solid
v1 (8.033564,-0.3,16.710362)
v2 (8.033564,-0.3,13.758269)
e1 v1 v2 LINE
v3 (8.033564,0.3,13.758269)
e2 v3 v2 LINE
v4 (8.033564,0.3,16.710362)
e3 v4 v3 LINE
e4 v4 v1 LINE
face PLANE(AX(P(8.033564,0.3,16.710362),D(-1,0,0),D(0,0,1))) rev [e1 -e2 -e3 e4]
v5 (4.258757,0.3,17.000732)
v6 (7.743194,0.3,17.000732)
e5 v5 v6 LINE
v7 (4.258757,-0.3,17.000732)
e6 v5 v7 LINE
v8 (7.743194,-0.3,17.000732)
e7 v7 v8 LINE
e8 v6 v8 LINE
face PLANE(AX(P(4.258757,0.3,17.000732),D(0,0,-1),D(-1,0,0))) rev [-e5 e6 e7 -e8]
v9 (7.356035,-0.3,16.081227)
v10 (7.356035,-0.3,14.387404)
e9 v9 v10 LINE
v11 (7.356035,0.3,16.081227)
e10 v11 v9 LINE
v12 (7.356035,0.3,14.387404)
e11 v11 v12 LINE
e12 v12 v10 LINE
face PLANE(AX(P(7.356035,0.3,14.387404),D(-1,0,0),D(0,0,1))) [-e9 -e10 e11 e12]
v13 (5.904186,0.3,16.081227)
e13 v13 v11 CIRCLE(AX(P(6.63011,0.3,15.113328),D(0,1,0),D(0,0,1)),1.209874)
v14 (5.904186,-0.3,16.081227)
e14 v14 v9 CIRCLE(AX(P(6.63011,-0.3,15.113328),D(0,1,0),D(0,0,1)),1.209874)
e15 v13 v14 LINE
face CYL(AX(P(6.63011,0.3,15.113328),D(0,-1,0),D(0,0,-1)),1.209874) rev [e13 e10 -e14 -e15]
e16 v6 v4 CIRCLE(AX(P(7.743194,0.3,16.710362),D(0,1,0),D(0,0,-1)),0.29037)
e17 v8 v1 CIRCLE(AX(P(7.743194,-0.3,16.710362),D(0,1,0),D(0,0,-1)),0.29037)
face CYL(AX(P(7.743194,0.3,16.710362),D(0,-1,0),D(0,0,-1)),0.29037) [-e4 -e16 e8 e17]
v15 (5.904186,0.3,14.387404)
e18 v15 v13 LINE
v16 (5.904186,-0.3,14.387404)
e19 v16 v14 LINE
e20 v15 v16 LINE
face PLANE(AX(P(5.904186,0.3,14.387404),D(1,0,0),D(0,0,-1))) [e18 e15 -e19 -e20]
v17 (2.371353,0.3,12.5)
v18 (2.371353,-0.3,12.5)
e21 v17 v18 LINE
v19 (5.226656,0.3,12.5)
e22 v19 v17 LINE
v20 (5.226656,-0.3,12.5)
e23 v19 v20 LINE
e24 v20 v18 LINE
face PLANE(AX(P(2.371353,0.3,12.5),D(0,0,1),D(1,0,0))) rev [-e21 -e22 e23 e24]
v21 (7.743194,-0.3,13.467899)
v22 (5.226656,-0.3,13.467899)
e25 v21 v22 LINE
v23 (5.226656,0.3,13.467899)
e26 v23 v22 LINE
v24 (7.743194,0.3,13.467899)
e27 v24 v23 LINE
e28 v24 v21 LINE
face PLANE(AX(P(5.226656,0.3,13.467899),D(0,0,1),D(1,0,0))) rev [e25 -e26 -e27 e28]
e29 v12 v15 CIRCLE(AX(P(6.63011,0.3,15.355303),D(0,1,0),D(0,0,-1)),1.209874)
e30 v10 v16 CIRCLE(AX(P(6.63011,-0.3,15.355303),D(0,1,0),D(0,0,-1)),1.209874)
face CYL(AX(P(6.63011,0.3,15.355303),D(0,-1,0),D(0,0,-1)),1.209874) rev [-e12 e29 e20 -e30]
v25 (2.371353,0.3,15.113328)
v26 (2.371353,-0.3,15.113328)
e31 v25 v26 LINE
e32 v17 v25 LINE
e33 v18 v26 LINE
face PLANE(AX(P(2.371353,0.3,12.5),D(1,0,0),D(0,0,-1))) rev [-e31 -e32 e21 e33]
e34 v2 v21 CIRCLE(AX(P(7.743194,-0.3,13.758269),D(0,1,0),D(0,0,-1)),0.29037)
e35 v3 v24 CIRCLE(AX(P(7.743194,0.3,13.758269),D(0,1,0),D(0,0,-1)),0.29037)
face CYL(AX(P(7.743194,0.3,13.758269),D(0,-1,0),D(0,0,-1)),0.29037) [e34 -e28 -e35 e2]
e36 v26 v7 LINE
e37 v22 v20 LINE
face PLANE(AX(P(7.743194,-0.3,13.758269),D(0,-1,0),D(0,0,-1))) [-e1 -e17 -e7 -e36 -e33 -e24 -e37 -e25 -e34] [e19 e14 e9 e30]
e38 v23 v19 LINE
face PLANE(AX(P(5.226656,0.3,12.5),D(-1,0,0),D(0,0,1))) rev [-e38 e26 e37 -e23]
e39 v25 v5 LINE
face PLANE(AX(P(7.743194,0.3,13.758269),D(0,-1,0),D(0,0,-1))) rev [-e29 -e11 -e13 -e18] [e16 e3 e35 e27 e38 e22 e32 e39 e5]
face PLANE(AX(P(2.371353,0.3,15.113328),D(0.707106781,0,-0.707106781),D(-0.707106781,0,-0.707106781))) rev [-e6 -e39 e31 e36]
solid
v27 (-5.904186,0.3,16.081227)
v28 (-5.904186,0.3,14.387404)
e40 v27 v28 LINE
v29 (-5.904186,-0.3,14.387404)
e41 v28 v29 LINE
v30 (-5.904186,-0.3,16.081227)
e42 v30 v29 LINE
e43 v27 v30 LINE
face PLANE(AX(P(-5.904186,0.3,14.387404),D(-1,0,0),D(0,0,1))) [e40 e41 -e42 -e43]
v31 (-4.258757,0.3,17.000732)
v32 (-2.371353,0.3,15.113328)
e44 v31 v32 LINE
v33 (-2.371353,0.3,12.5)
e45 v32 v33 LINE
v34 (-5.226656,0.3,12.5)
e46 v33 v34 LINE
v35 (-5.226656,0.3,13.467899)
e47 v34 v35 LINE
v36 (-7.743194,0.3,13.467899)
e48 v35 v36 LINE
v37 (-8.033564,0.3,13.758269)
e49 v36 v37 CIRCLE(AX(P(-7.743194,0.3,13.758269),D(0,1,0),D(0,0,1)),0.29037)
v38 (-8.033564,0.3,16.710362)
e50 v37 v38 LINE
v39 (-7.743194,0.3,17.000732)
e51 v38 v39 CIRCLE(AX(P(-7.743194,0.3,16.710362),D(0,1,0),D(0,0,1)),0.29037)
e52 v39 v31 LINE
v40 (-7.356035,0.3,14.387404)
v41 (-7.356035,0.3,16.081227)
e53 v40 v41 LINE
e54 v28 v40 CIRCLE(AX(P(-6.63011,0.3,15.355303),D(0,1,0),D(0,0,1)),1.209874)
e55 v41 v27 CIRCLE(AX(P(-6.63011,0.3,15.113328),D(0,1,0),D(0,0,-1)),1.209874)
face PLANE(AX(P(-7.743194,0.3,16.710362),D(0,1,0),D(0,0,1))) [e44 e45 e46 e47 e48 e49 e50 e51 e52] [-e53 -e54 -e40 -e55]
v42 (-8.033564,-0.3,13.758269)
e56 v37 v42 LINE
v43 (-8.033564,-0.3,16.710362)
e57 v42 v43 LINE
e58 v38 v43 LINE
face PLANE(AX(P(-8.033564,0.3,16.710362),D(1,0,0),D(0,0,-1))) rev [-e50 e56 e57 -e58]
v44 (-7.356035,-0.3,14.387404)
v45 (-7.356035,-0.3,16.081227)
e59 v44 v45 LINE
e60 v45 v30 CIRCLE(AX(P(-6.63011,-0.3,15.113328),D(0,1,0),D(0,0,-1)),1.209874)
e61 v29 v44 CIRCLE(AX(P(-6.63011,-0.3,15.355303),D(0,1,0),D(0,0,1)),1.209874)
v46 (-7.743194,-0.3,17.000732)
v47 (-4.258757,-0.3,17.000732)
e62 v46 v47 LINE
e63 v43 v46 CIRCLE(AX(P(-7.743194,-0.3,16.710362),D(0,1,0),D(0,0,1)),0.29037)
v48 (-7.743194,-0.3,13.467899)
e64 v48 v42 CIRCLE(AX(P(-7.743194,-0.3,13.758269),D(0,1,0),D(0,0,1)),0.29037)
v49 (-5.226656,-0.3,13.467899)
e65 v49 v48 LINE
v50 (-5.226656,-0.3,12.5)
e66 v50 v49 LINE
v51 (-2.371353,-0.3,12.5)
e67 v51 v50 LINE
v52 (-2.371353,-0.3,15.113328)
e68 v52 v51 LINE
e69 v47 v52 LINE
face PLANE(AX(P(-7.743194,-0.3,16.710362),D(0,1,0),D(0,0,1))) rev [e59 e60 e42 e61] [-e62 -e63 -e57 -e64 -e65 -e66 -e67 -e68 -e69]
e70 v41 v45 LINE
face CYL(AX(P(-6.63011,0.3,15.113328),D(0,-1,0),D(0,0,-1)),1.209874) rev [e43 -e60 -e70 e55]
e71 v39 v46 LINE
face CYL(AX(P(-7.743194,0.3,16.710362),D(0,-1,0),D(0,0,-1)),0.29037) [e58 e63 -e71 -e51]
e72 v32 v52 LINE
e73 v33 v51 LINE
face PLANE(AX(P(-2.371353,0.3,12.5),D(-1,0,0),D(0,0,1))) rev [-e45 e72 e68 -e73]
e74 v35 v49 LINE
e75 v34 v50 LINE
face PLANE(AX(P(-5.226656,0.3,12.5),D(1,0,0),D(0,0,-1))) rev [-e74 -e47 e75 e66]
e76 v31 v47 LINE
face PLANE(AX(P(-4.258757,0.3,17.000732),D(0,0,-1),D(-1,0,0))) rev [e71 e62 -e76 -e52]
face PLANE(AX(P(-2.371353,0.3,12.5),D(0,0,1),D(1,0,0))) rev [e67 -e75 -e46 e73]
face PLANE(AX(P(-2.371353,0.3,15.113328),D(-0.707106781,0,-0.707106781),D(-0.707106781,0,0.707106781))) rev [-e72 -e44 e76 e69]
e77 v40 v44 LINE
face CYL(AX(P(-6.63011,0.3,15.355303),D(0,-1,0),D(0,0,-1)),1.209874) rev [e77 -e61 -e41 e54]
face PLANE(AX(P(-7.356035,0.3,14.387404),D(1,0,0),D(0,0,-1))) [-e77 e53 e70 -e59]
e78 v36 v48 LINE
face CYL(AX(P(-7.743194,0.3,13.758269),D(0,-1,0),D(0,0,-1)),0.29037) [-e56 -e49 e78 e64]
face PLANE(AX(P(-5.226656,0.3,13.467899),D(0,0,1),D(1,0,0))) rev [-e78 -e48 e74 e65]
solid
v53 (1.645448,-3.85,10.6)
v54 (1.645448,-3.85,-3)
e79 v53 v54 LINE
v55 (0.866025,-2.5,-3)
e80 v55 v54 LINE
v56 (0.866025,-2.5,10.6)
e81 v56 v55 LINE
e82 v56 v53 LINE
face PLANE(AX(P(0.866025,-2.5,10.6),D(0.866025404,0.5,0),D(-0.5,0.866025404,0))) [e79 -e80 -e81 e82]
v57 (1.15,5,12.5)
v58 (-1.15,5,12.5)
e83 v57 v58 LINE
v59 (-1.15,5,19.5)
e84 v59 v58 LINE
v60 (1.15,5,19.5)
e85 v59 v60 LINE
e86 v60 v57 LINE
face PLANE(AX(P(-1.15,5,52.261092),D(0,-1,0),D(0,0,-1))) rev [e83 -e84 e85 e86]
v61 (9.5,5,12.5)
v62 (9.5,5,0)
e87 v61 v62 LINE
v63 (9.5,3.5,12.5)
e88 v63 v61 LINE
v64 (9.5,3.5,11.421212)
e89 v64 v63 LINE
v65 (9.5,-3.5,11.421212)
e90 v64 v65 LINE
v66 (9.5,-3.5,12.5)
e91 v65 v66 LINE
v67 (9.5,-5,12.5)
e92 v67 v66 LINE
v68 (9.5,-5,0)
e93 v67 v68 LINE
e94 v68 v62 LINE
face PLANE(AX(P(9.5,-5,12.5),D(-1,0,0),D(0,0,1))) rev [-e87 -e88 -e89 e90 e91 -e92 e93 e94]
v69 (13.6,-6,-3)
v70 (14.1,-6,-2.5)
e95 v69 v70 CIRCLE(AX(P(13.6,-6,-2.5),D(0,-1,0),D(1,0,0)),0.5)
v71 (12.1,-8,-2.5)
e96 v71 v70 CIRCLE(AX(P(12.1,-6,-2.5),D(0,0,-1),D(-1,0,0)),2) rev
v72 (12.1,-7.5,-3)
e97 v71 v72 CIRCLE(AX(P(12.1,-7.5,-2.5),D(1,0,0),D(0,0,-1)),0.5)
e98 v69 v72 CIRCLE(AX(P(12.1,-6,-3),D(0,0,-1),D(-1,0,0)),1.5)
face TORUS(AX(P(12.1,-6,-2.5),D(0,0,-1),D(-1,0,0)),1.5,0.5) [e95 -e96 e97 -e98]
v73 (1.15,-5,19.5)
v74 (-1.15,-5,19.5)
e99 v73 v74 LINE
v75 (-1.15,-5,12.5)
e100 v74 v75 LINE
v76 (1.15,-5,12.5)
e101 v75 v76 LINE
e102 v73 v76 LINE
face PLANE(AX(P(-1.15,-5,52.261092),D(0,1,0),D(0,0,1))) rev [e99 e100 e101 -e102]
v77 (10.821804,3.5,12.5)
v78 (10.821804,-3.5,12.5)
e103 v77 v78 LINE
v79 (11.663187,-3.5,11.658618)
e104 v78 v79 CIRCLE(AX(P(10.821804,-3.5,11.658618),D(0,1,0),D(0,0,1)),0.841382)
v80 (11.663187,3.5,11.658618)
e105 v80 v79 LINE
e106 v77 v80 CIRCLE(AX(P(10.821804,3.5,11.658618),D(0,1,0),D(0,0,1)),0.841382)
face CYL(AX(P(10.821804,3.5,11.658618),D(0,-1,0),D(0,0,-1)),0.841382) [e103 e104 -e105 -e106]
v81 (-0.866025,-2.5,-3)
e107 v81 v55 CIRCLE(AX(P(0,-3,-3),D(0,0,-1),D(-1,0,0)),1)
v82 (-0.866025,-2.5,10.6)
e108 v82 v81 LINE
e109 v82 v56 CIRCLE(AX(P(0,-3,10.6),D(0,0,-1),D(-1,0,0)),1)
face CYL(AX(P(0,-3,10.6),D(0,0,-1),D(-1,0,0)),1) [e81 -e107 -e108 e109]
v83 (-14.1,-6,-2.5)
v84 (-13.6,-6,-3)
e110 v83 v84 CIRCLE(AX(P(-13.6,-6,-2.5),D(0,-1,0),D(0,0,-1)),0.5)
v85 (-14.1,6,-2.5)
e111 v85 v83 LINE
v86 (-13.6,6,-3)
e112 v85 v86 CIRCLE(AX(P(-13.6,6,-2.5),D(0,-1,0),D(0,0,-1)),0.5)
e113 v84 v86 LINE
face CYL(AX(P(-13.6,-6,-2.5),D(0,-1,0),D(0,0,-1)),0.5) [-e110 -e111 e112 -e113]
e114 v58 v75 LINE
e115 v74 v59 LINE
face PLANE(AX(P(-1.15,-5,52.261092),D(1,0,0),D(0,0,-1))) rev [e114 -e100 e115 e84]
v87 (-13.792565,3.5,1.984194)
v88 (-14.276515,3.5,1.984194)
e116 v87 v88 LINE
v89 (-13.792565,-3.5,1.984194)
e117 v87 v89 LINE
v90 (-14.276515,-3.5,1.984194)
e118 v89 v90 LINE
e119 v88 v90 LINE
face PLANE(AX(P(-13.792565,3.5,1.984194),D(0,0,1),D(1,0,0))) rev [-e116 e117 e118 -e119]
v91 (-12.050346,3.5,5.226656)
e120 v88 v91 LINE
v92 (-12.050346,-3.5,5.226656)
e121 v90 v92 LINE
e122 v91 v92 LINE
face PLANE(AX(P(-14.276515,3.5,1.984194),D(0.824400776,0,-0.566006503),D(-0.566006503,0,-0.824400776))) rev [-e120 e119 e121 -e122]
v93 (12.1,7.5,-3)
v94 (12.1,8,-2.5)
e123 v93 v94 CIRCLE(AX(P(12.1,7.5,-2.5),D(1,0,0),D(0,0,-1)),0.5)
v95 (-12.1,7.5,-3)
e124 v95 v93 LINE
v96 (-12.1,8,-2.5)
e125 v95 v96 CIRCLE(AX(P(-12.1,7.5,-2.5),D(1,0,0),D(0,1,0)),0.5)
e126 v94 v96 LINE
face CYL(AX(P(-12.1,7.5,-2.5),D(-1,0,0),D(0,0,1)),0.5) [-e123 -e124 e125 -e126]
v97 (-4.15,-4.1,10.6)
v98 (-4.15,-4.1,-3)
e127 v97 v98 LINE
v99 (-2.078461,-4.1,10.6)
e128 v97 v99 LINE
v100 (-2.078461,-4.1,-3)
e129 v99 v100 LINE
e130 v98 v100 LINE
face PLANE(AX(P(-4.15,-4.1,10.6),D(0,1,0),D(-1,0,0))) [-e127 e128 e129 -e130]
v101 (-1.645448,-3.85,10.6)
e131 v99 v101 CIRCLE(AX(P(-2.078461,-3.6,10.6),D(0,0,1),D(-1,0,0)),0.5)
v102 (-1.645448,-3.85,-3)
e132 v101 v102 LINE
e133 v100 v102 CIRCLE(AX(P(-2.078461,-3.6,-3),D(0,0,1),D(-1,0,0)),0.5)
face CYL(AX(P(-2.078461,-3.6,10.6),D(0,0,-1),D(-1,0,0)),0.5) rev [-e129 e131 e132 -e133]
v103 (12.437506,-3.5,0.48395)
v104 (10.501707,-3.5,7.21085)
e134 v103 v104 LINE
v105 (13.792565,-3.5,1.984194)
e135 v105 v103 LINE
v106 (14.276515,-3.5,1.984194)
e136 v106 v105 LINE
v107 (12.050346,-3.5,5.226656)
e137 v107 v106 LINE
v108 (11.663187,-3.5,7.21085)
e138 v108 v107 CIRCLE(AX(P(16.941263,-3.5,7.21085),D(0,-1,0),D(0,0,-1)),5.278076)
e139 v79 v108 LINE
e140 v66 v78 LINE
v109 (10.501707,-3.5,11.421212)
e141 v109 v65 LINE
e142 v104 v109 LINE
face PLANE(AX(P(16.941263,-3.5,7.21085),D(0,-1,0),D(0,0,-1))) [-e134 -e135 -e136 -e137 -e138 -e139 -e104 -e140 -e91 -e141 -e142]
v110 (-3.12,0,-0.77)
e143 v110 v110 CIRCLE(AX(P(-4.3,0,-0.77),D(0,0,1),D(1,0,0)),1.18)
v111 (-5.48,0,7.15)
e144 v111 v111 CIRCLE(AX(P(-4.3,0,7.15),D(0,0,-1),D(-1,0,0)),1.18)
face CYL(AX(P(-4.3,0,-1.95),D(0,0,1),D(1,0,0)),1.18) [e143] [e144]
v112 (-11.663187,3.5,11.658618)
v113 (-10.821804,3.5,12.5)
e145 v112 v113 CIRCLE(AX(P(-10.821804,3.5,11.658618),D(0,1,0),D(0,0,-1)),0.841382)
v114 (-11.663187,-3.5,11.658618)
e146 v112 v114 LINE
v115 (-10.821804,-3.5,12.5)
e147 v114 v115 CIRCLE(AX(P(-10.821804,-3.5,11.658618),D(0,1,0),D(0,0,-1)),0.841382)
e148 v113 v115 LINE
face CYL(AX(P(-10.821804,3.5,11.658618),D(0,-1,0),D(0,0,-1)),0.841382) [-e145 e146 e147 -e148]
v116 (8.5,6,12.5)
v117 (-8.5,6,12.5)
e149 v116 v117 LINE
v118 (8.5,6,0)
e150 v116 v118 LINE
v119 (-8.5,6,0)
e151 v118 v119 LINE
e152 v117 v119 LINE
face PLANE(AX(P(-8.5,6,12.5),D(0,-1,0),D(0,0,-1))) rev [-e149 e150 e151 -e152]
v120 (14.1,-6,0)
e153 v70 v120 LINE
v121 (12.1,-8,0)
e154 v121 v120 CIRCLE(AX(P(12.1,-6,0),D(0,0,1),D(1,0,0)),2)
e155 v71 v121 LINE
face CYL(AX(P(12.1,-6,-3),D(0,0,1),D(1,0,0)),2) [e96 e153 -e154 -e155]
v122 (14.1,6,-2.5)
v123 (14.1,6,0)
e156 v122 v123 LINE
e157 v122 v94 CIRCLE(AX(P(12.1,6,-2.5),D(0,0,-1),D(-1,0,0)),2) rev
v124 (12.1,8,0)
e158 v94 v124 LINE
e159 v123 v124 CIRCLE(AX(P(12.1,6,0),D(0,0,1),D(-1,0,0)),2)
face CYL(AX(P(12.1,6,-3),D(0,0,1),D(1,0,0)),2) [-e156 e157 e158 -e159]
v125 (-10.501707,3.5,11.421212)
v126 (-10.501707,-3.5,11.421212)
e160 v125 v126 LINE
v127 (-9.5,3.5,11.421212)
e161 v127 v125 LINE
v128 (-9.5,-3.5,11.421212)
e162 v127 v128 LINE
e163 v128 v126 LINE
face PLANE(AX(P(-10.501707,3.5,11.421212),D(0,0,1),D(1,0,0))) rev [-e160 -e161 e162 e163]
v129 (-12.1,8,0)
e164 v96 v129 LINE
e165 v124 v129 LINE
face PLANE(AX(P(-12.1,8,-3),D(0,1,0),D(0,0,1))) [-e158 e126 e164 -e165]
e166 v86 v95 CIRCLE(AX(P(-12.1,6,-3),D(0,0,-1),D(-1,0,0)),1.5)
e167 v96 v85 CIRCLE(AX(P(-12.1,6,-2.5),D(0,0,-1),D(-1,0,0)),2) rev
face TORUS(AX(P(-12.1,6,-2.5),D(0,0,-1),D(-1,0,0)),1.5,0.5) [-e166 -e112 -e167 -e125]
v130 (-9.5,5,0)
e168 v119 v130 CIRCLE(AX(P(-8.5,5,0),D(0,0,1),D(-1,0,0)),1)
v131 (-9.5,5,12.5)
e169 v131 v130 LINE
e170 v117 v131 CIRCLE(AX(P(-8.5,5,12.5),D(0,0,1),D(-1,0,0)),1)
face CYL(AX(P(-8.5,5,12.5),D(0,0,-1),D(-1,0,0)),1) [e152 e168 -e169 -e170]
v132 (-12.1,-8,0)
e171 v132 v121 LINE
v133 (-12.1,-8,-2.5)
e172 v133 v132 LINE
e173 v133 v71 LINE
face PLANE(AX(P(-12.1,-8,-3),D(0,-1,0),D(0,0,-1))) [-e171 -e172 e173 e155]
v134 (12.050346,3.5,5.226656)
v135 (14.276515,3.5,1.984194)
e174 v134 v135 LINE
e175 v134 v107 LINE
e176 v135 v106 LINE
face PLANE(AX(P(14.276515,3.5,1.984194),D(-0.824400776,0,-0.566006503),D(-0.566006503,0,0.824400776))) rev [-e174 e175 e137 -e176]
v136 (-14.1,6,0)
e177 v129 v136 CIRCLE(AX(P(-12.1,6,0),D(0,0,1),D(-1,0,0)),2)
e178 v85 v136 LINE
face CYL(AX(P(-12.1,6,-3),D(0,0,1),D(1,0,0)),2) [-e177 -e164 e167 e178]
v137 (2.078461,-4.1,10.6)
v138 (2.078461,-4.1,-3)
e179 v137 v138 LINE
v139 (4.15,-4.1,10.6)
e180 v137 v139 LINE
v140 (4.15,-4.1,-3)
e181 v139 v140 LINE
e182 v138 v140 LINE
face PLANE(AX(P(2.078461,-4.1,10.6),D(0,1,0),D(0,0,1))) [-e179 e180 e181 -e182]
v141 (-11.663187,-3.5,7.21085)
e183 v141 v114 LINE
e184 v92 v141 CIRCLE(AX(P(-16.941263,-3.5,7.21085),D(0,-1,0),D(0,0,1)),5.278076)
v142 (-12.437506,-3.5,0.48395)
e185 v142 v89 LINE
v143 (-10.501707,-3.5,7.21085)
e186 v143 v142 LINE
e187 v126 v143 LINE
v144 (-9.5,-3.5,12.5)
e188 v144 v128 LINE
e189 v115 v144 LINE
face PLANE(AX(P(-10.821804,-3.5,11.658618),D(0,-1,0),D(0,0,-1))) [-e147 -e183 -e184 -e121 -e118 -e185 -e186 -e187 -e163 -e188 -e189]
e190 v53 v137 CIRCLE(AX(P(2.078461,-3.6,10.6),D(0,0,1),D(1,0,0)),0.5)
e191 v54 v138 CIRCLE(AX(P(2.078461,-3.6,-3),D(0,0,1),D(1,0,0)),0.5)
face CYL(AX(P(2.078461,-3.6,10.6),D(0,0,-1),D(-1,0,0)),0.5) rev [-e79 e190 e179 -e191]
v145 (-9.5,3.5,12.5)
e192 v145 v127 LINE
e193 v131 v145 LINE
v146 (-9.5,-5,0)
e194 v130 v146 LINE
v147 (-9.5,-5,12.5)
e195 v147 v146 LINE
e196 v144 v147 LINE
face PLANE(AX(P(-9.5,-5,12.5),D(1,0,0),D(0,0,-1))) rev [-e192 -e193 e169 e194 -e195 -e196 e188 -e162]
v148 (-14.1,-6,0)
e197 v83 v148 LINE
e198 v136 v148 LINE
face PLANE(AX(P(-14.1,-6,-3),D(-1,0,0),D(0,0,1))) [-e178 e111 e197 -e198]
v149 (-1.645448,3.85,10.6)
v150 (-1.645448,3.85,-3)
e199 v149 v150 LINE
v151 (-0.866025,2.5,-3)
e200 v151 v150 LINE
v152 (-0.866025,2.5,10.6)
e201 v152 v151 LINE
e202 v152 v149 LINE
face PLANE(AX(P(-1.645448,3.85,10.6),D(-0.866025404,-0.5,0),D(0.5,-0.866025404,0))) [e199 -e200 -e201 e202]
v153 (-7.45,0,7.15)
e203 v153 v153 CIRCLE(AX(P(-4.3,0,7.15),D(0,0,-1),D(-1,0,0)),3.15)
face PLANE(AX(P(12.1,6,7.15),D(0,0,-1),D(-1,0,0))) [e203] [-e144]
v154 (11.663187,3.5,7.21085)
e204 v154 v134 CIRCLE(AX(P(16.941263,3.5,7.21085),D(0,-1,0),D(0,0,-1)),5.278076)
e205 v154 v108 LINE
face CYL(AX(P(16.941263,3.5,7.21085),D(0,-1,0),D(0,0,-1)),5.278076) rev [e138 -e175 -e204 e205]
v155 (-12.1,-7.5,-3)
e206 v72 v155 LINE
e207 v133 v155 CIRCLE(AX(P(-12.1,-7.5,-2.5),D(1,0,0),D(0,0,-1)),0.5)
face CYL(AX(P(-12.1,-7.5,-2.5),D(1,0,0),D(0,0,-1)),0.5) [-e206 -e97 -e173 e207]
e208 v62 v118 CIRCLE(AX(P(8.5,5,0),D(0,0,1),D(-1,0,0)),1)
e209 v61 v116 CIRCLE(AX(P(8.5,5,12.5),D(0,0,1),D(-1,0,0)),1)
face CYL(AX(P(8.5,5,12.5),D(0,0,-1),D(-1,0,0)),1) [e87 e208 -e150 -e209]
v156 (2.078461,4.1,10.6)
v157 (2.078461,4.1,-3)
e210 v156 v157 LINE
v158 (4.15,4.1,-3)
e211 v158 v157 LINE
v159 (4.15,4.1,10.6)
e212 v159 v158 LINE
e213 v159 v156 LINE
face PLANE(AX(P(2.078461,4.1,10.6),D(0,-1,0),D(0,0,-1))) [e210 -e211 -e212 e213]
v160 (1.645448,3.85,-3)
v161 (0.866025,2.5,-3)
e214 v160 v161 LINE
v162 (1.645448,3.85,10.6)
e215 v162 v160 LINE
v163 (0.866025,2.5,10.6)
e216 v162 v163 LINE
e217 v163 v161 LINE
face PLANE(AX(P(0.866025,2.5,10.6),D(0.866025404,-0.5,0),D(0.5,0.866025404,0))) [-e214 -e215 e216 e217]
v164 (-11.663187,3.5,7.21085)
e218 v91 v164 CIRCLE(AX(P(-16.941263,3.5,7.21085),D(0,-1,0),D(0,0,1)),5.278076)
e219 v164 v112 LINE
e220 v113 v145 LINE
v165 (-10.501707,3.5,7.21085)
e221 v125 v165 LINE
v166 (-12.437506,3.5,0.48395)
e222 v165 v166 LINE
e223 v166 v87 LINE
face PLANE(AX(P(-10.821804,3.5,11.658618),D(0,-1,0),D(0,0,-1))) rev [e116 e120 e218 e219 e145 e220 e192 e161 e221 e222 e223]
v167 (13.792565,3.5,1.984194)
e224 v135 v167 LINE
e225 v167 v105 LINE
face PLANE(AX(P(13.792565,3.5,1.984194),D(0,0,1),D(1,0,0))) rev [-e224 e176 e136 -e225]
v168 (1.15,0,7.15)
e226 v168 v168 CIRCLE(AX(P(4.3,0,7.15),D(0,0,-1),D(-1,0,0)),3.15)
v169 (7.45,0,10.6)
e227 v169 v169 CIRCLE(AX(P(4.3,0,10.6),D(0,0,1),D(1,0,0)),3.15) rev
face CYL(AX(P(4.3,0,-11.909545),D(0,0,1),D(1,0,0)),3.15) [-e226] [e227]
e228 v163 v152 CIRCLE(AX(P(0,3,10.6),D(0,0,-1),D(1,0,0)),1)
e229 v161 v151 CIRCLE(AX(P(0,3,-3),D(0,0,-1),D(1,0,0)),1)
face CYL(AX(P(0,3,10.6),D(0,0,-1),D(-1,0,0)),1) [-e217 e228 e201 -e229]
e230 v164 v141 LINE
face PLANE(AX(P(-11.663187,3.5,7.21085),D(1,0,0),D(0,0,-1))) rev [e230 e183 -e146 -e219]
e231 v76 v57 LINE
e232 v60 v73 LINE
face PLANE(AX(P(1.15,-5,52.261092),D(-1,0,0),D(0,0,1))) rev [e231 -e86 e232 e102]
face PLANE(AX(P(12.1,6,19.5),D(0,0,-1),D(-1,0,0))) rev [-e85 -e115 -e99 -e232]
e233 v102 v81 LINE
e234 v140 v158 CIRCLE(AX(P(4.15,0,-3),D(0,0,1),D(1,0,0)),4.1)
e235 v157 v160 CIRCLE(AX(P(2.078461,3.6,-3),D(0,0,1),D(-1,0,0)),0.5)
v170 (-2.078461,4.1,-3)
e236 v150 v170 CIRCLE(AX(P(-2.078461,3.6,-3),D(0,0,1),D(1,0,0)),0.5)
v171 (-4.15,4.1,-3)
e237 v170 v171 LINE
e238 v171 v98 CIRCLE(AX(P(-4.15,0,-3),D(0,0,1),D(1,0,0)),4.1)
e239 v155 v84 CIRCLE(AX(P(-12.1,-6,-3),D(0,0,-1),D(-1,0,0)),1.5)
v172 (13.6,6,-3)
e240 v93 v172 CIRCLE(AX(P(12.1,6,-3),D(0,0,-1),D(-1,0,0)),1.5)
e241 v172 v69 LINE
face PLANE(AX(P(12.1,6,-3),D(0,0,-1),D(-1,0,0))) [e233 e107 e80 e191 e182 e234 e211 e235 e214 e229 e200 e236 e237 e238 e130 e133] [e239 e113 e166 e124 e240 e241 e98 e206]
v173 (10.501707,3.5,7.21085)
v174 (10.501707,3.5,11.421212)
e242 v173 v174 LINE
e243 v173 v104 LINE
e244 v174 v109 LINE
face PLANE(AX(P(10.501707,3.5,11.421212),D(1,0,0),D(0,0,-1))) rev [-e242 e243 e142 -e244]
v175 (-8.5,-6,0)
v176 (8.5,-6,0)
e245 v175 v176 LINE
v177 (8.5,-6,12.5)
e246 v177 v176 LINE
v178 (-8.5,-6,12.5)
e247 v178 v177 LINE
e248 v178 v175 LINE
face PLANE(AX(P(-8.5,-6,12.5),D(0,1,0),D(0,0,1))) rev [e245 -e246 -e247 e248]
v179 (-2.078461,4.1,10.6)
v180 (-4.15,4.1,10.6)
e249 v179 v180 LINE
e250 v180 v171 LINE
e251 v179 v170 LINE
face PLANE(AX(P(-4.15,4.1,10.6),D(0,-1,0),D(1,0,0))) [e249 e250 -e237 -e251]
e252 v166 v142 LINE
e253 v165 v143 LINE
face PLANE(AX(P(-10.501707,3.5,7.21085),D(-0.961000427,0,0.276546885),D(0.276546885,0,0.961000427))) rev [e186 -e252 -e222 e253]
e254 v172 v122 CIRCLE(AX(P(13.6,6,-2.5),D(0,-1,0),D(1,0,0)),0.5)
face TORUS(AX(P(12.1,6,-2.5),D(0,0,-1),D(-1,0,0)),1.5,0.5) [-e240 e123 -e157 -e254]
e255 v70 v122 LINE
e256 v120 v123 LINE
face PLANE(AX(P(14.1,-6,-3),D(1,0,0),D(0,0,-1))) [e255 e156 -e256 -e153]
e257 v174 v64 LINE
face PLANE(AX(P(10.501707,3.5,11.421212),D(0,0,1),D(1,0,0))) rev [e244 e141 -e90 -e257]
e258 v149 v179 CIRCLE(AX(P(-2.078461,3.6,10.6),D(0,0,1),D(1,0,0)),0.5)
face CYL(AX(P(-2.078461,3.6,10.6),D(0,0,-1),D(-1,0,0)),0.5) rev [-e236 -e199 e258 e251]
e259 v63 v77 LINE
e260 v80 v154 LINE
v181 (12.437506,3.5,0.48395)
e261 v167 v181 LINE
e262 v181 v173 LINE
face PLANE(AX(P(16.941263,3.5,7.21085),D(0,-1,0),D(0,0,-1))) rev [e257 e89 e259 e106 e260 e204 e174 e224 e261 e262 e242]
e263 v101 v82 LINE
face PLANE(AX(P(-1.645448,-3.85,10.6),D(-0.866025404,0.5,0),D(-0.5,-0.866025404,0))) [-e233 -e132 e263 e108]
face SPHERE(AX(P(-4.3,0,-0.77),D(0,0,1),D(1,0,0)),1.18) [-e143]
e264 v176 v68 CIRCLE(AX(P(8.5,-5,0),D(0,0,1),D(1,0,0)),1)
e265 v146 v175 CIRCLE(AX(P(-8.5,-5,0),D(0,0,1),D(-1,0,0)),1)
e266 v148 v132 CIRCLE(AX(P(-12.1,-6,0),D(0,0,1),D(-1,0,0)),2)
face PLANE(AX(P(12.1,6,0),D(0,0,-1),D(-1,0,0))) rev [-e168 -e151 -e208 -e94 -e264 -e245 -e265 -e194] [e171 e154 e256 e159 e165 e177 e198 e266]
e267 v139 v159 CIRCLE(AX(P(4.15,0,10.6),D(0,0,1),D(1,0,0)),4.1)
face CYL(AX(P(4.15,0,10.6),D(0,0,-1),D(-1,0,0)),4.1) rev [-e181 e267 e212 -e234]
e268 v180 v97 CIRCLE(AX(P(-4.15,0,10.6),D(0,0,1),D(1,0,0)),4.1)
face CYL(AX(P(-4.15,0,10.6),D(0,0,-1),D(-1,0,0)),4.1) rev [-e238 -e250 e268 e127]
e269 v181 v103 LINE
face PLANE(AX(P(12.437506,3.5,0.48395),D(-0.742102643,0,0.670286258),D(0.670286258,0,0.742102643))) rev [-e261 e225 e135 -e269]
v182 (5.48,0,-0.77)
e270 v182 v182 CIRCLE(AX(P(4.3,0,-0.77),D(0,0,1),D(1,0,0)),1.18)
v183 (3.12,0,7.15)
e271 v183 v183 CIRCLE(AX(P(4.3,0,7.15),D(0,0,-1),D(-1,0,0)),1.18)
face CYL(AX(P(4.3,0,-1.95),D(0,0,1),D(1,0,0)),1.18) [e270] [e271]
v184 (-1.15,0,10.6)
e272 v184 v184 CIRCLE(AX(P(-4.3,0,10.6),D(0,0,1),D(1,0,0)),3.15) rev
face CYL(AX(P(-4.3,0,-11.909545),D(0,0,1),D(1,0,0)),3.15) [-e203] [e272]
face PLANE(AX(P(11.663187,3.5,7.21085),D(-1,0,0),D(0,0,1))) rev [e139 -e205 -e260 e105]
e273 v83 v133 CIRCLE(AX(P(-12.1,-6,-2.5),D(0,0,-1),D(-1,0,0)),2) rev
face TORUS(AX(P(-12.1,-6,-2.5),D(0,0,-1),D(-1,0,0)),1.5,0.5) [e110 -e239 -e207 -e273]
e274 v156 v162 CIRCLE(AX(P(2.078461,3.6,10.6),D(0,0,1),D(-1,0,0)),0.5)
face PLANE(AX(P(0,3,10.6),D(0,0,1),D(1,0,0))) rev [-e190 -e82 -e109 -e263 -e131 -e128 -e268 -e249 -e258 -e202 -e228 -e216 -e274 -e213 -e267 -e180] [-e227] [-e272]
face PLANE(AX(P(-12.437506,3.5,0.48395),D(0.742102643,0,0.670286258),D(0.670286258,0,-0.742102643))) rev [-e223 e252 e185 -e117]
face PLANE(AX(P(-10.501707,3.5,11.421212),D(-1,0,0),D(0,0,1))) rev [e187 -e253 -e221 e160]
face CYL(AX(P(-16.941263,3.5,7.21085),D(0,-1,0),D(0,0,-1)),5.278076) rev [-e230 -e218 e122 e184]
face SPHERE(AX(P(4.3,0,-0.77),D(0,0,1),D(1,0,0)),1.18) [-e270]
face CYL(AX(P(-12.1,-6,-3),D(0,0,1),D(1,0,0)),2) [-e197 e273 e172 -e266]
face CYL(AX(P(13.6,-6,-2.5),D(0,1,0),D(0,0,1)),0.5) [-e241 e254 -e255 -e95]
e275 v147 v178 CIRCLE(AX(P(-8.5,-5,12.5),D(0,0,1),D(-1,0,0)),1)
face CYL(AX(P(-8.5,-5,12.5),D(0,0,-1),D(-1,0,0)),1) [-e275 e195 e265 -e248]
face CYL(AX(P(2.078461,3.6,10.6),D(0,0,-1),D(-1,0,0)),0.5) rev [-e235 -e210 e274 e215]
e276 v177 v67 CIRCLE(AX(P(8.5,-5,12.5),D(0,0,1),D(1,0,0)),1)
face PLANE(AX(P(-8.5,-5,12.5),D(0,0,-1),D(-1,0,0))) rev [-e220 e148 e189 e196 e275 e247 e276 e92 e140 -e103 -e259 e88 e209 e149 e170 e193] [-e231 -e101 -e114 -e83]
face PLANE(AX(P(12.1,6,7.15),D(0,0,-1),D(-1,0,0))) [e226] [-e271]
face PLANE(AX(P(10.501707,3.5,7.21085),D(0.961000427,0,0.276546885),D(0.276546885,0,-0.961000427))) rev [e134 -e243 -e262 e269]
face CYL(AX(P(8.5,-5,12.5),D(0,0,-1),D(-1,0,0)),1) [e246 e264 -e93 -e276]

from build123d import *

# Parameters (mm, degrees)
BOSS_EXTRUDE1_DEPTH         = 3
BOSS_EXTRUDE3_DEPTH         = 12.5
BOSS_EXTRUDE7_DEPTH         = 3.5
CUT_EXTRUDE1_DEPTH          = 13.6
SKETCH5_W                   = 2.3
SKETCH5_H                   = 10
BOSS_EXTRUDE4_DEPTH         = 7
SKETCH7_R                   = 3.15
BOSS_EXTRUDE6_DEPTH         = 3.45
SKETCH6_R                   = 1.18
BOSS_EXTRUDE5_DEPTH         = 9.1
FILLET3_R                   = 1.18
FILLET4_R                   = 0.5
BOSS_EXTRUDE8_DEPTH         = 0.3
BOSS_EXTRUDE8_2_DEPTH       = 0.3
BODY_MOVE_COPY1_START       = -0.3
BODY_MOVE_COPY1_DEPTH       = 0.6
BODY_MOVE_COPY1_2_OUTLINE_W = 2.855302951
BODY_MOVE_COPY1_2_OUTLINE_H = 0.131085938
BODY_MOVE_COPY1_2_DEPTH     = 0.6


# Read off the part's stored shape, not the designer's step: Body-Move/Copy1
with BuildPart() as part:
    # Sketch1 → Boss-Extrude1 (new body)
    with BuildSketch(Plane.XY):
        with BuildLine():
            Line((-12.1, -8), (12.1, -8))
            ThreePointArc((12.1, -8), (13.514213562, -7.414213562), (14.1, -6))
            Line((14.1, -6), (14.1, 6))
            ThreePointArc((14.1, 6), (13.514213562, 7.414213562), (12.1, 8))
            Line((12.1, 8), (-12.1, 8))
            ThreePointArc((-12.1, 8), (-13.514213562, 7.414213562), (-14.1, 6))
            Line((-14.1, 6), (-14.1, -6))
            ThreePointArc((-14.1, -6), (-13.514213562, -7.414213562), (-12.1, -8))
        make_face()
    extrude(amount=-BOSS_EXTRUDE1_DEPTH)

    # Sketch3 → Boss-Extrude3 (add)
    with BuildSketch(Plane.XY):
        with BuildLine():
            Line((-8.5, -6), (8.5, -6))
            ThreePointArc((8.5, -6), (9.207106781, -5.707106781), (9.5, -5))
            Line((9.5, -5), (9.5, 5))
            ThreePointArc((9.5, 5), (9.207106781, 5.707106781), (8.5, 6))
            Line((8.5, 6), (-8.5, 6))
            ThreePointArc((-8.5, 6), (-9.207106781, 5.707106781), (-9.5, 5))
            Line((-9.5, 5), (-9.5, -5))
            ThreePointArc((-9.5, -5), (-9.207106781, -5.707106781), (-8.5, -6))
        make_face()
    extrude(amount=BOSS_EXTRUDE3_DEPTH)

    # Sketch10 → Boss-Extrude7 (add, symmetric)
    with BuildSketch(Plane(origin=(0, 0, 0), x_dir=(1, 0, 0), z_dir=(0, 1, 0))):
        with BuildLine():
            Line((12.437506076, -0.483949653), (13.792565104, -1.984193576))
            Line((13.792565104, -1.984193576), (14.276514757, -1.984193576))
            Line((14.276514757, -1.984193576), (12.050346354, -5.22665625))
            ThreePointArc((12.050346354, -5.22665625), (11.760880692, -6.200043614), (11.663186632, -7.210849826))
            Line((11.663186632, -7.210849826), (11.663186632, -11.658617679))
            ThreePointArc((11.663186632, -11.658617679), (11.416751456, -12.253564824), (10.82180431, -12.5))
            Line((10.82180431, -12.5), (9.5, -12.5))
            Line((9.5, -12.5), (9.5, -11.421211806))
            Line((9.5, -11.421211806), (10.501707465, -11.421211806))
            Line((10.501707465, -11.421211806), (10.501707465, -7.210849826))
            Line((10.501707465, -7.210849826), (12.437506076, -0.483949653))
        make_face()
        with BuildLine():
            Line((-9.5, -12.5), (-9.5, -11.421211806))
            Line((-9.5, -11.421211806), (-10.501707465, -11.421211806))
            Line((-10.501707465, -11.421211806), (-10.501707465, -7.210849826))
            Line((-10.501707465, -7.210849826), (-12.437506076, -0.483949653))
            Line((-12.437506076, -0.483949653), (-13.792565104, -1.984193576))
            Line((-13.792565104, -1.984193576), (-14.276514757, -1.984193576))
            Line((-14.276514757, -1.984193576), (-12.050346354, -5.22665625))
            ThreePointArc((-12.050346354, -5.22665625), (-11.760880692, -6.200043614), (-11.663186632, -7.210849826))
            Line((-11.663186632, -7.210849826), (-11.663186632, -11.658617679))
            ThreePointArc((-11.663186632, -11.658617679), (-11.416751456, -12.253564824), (-10.82180431, -12.5))
            Line((-10.82180431, -12.5), (-9.5, -12.5))
        make_face()
    extrude(amount=BOSS_EXTRUDE7_DEPTH, both=True)

    # Sketch4 → Cut-Extrude1 (cut)
    with BuildSketch(Plane.XY.offset(-3)):
        with BuildLine():
            Line((-1.645448267, 3.85), (-0.866025404, 2.5))
            ThreePointArc((-0.866025404, 2.5), (0, 2), (0.866025404, 2.5))
            Line((0.866025404, 2.5), (1.645448267, 3.85))
            ThreePointArc((1.645448267, 3.85), (1.828460969, 4.033012702), (2.078460969, 4.1))
            Line((2.078460969, 4.1), (4.15, 4.1))
            ThreePointArc((4.15, 4.1), (8.25, 0), (4.15, -4.1))
            Line((4.15, -4.1), (2.078460969, -4.1))
            ThreePointArc((2.078460969, -4.1), (1.828460969, -4.033012702), (1.645448267, -3.85))
            Line((1.645448267, -3.85), (0.866025404, -2.5))
            ThreePointArc((0.866025404, -2.5), (0, -2), (-0.866025404, -2.5))
            Line((-0.866025404, -2.5), (-1.645448267, -3.85))
            ThreePointArc((-1.645448267, -3.85), (-1.828460969, -4.033012702), (-2.078460969, -4.1))
            Line((-2.078460969, -4.1), (-4.15, -4.1))
            ThreePointArc((-4.15, -4.1), (-8.25, 0), (-4.15, 4.1))
            Line((-4.15, 4.1), (-2.078460969, 4.1))
            ThreePointArc((-2.078460969, 4.1), (-1.828460969, 4.033012702), (-1.645448267, 3.85))
        make_face()
    extrude(amount=CUT_EXTRUDE1_DEPTH, mode=Mode.SUBTRACT)

    # Sketch5 → Boss-Extrude4 (add)
    with BuildSketch(Plane.XY.offset(12.5)):
        Rectangle(SKETCH5_W, SKETCH5_H)
    extrude(amount=BOSS_EXTRUDE4_DEPTH)

    # Sketch7 → Boss-Extrude6 (add)
    with BuildSketch(Plane(origin=(0, 0, 10.6), x_dir=(-1, 0, 0), z_dir=(0, 0, -1))):
        with Locations(Location((-4.3, 0, 0), (0, 0, 180))):
            Circle(SKETCH7_R)
        with Locations(Location((4.3, 0, 0), (0, 0, 180))):
            Circle(SKETCH7_R)
    extrude(amount=BOSS_EXTRUDE6_DEPTH)

    # Sketch6 → Boss-Extrude5 (add)
    with BuildSketch(Plane(origin=(0, 0, 7.15), x_dir=(-1, 0, 0), z_dir=(0, 0, -1))):
        with Locations((-4.3, 0)):
            Circle(SKETCH6_R)
        with Locations((4.3, 0)):
            Circle(SKETCH6_R)
    extrude(amount=BOSS_EXTRUDE5_DEPTH)

    # Fillet3
    fillet3_edges = [part.edges().sort_by_distance(p)[0] for p in [
        (5.48, 0, -1.95),
        (-3.12, 0, -1.95),
    ]]
    fillet(fillet3_edges, radius=FILLET3_R)

    # Fillet4
    fillet4_edges = [part.edges().sort_by_distance(p)[0] for p in [
        (-13.514213562, 7.414213562, -3),
        (-14.1, 0, -3),
        (-13.514213562, -7.414213562, -3),
        (0, -8, -3),
        (13.514213562, -7.414213562, -3),
        (14.1, 0, -3),
        (13.514213562, 7.414213562, -3),
        (0, 8, -3),
    ]]
    fillet(fillet4_edges, radius=FILLET4_R)


with BuildPart() as body_2:
    # Sketch11 → Boss-Extrude8 (new, symmetric)
    with BuildSketch(Plane(origin=(0, 0, 0), x_dir=(1, 0, 0), z_dir=(0, 1, 0))):
        with BuildLine():
            Line((2.371353299, -12.631085938), (2.371353299, -15.244414062))
            Line((2.371353299, -15.244414062), (4.258756944, -17.131817708))
            Line((4.258756944, -17.131817708), (7.743194444, -17.131817708))
            ThreePointArc((7.743194444, -17.131817708), (7.948516893, -17.046770365), (8.033564236, -16.841447917))
            Line((8.033564236, -16.841447917), (8.033564236, -13.889355035))
            ThreePointArc((8.033564236, -13.889355035), (7.948516893, -13.684032586), (7.743194444, -13.598985243))
            Line((7.743194444, -13.598985243), (5.22665625, -13.598985243))
            Line((5.22665625, -13.598985243), (5.22665625, -12.631085938))
            Line((5.22665625, -12.631085938), (2.371353299, -12.631085938))
        make_face()
        with BuildLine():
            Line((5.904185764, -14.518489583), (5.904185764, -16.212313368))
            ThreePointArc((5.904185764, -16.212313368), (6.630110243, -16.454288194), (7.356034722, -16.212313368))
            Line((7.356034722, -16.212313368), (7.356034722, -14.518489583))
            ThreePointArc((7.356034722, -14.518489583), (6.630110243, -14.276514757), (5.904185764, -14.518489583))
        make_face(mode=Mode.SUBTRACT)
    extrude(amount=BOSS_EXTRUDE8_DEPTH, both=True)


with BuildPart() as body_3:
    # Sketch11 → Boss-Extrude8 2 (new, symmetric)
    with BuildSketch(Plane(origin=(0, 0, 0), x_dir=(1, 0, 0), z_dir=(0, 1, 0))):
        with BuildLine():
            Line((-2.371353299, -12.631085938), (-5.22665625, -12.631085938))
            Line((-5.22665625, -12.631085938), (-5.22665625, -13.598985243))
            Line((-5.22665625, -13.598985243), (-7.743194444, -13.598985243))
            ThreePointArc((-7.743194444, -13.598985243), (-7.948516893, -13.684032586), (-8.033564236, -13.889355035))
            Line((-8.033564236, -13.889355035), (-8.033564236, -16.841447917))
            ThreePointArc((-8.033564236, -16.841447917), (-7.948516893, -17.046770365), (-7.743194444, -17.131817708))
            Line((-7.743194444, -17.131817708), (-4.258756944, -17.131817708))
            Line((-4.258756944, -17.131817708), (-2.371353299, -15.244414062))
            Line((-2.371353299, -15.244414062), (-2.371353299, -12.631085938))
        make_face()
        with BuildLine():
            Line((-7.356034722, -14.518489583), (-7.356034722, -16.212313368))
            ThreePointArc((-7.356034722, -16.212313368), (-6.630110243, -16.454288194), (-5.904185764, -16.212313368))
            Line((-5.904185764, -16.212313368), (-5.904185764, -14.518489583))
            ThreePointArc((-5.904185764, -14.518489583), (-6.630110243, -14.276514757), (-7.356034722, -14.518489583))
        make_face(mode=Mode.SUBTRACT)
    extrude(amount=BOSS_EXTRUDE8_2_DEPTH, both=True)


with BuildPart() as body_move_copy1_tool:
    # Body-Move/Copy1 outline → Body-Move/Copy1 (new body)
    with BuildSketch(Plane(origin=(0, 0, 0), x_dir=(1, 0, 0), z_dir=(0, 1, 0)).offset(BODY_MOVE_COPY1_START)):
        with BuildLine():
            Line((-4.258756944, -17.000731771), (-7.743194444, -17.000731771))
            ThreePointArc((-7.743194444, -17.000731771), (-7.948516893, -16.915684428), (-8.033564236, -16.710361979))
            Line((-8.033564236, -16.710361979), (-8.033564236, -16.841447917))
            ThreePointArc((-8.033564236, -16.841447917), (-7.948516893, -17.046770365), (-7.743194444, -17.131817708))
            Line((-7.743194444, -17.131817708), (-4.258756944, -17.131817708))
            Line((-4.258756944, -17.131817708), (-2.371353299, -15.244414063))
            Line((-2.371353299, -15.244414063), (-2.371353299, -15.113328125))
            Line((-2.371353299, -15.113328125), (-4.258756944, -17.000731771))
        make_face()
        with BuildLine():
            ThreePointArc((8.033564236, -16.710361979), (7.948516893, -16.915684428), (7.743194444, -17.000731771))
            Line((7.743194444, -17.000731771), (4.258756944, -17.000731771))
            Line((4.258756944, -17.000731771), (2.371353299, -15.113328125))
            Line((2.371353299, -15.113328125), (2.371353299, -15.244414063))
            Line((2.371353299, -15.244414063), (4.258756944, -17.131817708))
            Line((4.258756944, -17.131817708), (7.743194444, -17.131817708))
            ThreePointArc((7.743194444, -17.131817708), (7.948516893, -17.046770365), (8.033564236, -16.841447917))
            Line((8.033564236, -16.841447917), (8.033564236, -16.710361979))
        make_face()
        with BuildLine():
            ThreePointArc((-7.356034722, -14.518489583), (-6.630110243, -14.276514757), (-5.904185764, -14.518489583))
            Line((-5.904185764, -14.518489583), (-5.904185764, -14.387403646))
            ThreePointArc((-5.904185764, -14.387403646), (-6.630110243, -14.145428819), (-7.356034722, -14.387403646))
            Line((-7.356034722, -14.387403646), (-7.356034722, -14.518489583))
        make_face()
        with BuildLine():
            ThreePointArc((5.904185764, -14.518489583), (6.630110243, -14.276514757), (7.356034722, -14.518489583))
            Line((7.356034722, -14.518489583), (7.356034722, -14.387403646))
            ThreePointArc((7.356034722, -14.387403646), (6.630110243, -14.145428819), (5.904185764, -14.387403646))
            Line((5.904185764, -14.387403646), (5.904185764, -14.518489583))
        make_face()
    extrude(amount=BODY_MOVE_COPY1_DEPTH)


with BuildPart() as body_2_1:
    add(body_2.part)

    # Body-Move/Copy1: cut by body_move_copy1_tool
    add(body_move_copy1_tool.part, mode=Mode.SUBTRACT)


with BuildPart() as body_3_1:
    add(body_3.part)

    # Body-Move/Copy1: cut by body_move_copy1_tool
    add(body_move_copy1_tool.part, mode=Mode.SUBTRACT)


    add(body_2_1.part)  # Body-Move_Copy1 2 merges body 2
    # Body-Move_Copy1 2 outline → Body-Move_Copy1 2 (add)
    with BuildSketch(Plane(origin=(0, 0, 0), x_dir=(1, 0, 0), z_dir=(0, 1, 0)).offset(BODY_MOVE_COPY1_START)):
        with BuildLine():
            Line((-8.033564236, -13.758269097), (-8.033564236, -13.889355035))
            ThreePointArc((-8.033564236, -13.889355035), (-7.948516893, -13.684032586), (-7.743194444, -13.598985243))
            Line((-7.743194444, -13.598985243), (-5.22665625, -13.598985243))
            Line((-5.22665625, -13.598985243), (-5.22665625, -13.467899306))
            Line((-5.22665625, -13.467899306), (-7.743194444, -13.467899306))
            ThreePointArc((-7.743194444, -13.467899306), (-7.948516893, -13.552946648), (-8.033564236, -13.758269097))
        make_face()
        with Locations((-3.799004775, -12.565542969)):
            Rectangle(BODY_MOVE_COPY1_2_OUTLINE_W, BODY_MOVE_COPY1_2_OUTLINE_H)
        with BuildLine():
            ThreePointArc((7.743194444, -13.598985243), (7.948516893, -13.684032586), (8.033564236, -13.889355035))
            Line((8.033564236, -13.889355035), (8.033564236, -13.758269097))
            ThreePointArc((8.033564236, -13.758269097), (7.948516893, -13.552946648), (7.743194444, -13.467899306))
            Line((7.743194444, -13.467899306), (5.22665625, -13.467899306))
            Line((5.22665625, -13.467899306), (5.22665625, -13.598985243))
            Line((5.22665625, -13.598985243), (7.743194444, -13.598985243))
        make_face()
        with Locations((3.799004775, -12.565542969)):
            Rectangle(BODY_MOVE_COPY1_2_OUTLINE_W, BODY_MOVE_COPY1_2_OUTLINE_H)
        with BuildLine():
            Line((-5.904185764, -16.212313368), (-5.904185764, -16.081227431))
            ThreePointArc((-5.904185764, -16.081227431), (-6.630110243, -16.323202257), (-7.356034722, -16.081227431))
            Line((-7.356034722, -16.081227431), (-7.356034722, -16.212313368))
            ThreePointArc((-7.356034722, -16.212313368), (-6.630110243, -16.454288194), (-5.904185764, -16.212313368))
        make_face()
        with BuildLine():
            Line((7.356034722, -16.212313368), (7.356034722, -16.081227431))
            ThreePointArc((7.356034722, -16.081227431), (6.630110243, -16.323202257), (5.904185764, -16.081227431))
            Line((5.904185764, -16.081227431), (5.904185764, -16.212313368))
            ThreePointArc((5.904185764, -16.212313368), (6.630110243, -16.454288194), (7.356034722, -16.212313368))
        make_face()
    extrude(amount=BODY_MOVE_COPY1_2_DEPTH)


solid = Compound([part.part, body_3_1.part])
